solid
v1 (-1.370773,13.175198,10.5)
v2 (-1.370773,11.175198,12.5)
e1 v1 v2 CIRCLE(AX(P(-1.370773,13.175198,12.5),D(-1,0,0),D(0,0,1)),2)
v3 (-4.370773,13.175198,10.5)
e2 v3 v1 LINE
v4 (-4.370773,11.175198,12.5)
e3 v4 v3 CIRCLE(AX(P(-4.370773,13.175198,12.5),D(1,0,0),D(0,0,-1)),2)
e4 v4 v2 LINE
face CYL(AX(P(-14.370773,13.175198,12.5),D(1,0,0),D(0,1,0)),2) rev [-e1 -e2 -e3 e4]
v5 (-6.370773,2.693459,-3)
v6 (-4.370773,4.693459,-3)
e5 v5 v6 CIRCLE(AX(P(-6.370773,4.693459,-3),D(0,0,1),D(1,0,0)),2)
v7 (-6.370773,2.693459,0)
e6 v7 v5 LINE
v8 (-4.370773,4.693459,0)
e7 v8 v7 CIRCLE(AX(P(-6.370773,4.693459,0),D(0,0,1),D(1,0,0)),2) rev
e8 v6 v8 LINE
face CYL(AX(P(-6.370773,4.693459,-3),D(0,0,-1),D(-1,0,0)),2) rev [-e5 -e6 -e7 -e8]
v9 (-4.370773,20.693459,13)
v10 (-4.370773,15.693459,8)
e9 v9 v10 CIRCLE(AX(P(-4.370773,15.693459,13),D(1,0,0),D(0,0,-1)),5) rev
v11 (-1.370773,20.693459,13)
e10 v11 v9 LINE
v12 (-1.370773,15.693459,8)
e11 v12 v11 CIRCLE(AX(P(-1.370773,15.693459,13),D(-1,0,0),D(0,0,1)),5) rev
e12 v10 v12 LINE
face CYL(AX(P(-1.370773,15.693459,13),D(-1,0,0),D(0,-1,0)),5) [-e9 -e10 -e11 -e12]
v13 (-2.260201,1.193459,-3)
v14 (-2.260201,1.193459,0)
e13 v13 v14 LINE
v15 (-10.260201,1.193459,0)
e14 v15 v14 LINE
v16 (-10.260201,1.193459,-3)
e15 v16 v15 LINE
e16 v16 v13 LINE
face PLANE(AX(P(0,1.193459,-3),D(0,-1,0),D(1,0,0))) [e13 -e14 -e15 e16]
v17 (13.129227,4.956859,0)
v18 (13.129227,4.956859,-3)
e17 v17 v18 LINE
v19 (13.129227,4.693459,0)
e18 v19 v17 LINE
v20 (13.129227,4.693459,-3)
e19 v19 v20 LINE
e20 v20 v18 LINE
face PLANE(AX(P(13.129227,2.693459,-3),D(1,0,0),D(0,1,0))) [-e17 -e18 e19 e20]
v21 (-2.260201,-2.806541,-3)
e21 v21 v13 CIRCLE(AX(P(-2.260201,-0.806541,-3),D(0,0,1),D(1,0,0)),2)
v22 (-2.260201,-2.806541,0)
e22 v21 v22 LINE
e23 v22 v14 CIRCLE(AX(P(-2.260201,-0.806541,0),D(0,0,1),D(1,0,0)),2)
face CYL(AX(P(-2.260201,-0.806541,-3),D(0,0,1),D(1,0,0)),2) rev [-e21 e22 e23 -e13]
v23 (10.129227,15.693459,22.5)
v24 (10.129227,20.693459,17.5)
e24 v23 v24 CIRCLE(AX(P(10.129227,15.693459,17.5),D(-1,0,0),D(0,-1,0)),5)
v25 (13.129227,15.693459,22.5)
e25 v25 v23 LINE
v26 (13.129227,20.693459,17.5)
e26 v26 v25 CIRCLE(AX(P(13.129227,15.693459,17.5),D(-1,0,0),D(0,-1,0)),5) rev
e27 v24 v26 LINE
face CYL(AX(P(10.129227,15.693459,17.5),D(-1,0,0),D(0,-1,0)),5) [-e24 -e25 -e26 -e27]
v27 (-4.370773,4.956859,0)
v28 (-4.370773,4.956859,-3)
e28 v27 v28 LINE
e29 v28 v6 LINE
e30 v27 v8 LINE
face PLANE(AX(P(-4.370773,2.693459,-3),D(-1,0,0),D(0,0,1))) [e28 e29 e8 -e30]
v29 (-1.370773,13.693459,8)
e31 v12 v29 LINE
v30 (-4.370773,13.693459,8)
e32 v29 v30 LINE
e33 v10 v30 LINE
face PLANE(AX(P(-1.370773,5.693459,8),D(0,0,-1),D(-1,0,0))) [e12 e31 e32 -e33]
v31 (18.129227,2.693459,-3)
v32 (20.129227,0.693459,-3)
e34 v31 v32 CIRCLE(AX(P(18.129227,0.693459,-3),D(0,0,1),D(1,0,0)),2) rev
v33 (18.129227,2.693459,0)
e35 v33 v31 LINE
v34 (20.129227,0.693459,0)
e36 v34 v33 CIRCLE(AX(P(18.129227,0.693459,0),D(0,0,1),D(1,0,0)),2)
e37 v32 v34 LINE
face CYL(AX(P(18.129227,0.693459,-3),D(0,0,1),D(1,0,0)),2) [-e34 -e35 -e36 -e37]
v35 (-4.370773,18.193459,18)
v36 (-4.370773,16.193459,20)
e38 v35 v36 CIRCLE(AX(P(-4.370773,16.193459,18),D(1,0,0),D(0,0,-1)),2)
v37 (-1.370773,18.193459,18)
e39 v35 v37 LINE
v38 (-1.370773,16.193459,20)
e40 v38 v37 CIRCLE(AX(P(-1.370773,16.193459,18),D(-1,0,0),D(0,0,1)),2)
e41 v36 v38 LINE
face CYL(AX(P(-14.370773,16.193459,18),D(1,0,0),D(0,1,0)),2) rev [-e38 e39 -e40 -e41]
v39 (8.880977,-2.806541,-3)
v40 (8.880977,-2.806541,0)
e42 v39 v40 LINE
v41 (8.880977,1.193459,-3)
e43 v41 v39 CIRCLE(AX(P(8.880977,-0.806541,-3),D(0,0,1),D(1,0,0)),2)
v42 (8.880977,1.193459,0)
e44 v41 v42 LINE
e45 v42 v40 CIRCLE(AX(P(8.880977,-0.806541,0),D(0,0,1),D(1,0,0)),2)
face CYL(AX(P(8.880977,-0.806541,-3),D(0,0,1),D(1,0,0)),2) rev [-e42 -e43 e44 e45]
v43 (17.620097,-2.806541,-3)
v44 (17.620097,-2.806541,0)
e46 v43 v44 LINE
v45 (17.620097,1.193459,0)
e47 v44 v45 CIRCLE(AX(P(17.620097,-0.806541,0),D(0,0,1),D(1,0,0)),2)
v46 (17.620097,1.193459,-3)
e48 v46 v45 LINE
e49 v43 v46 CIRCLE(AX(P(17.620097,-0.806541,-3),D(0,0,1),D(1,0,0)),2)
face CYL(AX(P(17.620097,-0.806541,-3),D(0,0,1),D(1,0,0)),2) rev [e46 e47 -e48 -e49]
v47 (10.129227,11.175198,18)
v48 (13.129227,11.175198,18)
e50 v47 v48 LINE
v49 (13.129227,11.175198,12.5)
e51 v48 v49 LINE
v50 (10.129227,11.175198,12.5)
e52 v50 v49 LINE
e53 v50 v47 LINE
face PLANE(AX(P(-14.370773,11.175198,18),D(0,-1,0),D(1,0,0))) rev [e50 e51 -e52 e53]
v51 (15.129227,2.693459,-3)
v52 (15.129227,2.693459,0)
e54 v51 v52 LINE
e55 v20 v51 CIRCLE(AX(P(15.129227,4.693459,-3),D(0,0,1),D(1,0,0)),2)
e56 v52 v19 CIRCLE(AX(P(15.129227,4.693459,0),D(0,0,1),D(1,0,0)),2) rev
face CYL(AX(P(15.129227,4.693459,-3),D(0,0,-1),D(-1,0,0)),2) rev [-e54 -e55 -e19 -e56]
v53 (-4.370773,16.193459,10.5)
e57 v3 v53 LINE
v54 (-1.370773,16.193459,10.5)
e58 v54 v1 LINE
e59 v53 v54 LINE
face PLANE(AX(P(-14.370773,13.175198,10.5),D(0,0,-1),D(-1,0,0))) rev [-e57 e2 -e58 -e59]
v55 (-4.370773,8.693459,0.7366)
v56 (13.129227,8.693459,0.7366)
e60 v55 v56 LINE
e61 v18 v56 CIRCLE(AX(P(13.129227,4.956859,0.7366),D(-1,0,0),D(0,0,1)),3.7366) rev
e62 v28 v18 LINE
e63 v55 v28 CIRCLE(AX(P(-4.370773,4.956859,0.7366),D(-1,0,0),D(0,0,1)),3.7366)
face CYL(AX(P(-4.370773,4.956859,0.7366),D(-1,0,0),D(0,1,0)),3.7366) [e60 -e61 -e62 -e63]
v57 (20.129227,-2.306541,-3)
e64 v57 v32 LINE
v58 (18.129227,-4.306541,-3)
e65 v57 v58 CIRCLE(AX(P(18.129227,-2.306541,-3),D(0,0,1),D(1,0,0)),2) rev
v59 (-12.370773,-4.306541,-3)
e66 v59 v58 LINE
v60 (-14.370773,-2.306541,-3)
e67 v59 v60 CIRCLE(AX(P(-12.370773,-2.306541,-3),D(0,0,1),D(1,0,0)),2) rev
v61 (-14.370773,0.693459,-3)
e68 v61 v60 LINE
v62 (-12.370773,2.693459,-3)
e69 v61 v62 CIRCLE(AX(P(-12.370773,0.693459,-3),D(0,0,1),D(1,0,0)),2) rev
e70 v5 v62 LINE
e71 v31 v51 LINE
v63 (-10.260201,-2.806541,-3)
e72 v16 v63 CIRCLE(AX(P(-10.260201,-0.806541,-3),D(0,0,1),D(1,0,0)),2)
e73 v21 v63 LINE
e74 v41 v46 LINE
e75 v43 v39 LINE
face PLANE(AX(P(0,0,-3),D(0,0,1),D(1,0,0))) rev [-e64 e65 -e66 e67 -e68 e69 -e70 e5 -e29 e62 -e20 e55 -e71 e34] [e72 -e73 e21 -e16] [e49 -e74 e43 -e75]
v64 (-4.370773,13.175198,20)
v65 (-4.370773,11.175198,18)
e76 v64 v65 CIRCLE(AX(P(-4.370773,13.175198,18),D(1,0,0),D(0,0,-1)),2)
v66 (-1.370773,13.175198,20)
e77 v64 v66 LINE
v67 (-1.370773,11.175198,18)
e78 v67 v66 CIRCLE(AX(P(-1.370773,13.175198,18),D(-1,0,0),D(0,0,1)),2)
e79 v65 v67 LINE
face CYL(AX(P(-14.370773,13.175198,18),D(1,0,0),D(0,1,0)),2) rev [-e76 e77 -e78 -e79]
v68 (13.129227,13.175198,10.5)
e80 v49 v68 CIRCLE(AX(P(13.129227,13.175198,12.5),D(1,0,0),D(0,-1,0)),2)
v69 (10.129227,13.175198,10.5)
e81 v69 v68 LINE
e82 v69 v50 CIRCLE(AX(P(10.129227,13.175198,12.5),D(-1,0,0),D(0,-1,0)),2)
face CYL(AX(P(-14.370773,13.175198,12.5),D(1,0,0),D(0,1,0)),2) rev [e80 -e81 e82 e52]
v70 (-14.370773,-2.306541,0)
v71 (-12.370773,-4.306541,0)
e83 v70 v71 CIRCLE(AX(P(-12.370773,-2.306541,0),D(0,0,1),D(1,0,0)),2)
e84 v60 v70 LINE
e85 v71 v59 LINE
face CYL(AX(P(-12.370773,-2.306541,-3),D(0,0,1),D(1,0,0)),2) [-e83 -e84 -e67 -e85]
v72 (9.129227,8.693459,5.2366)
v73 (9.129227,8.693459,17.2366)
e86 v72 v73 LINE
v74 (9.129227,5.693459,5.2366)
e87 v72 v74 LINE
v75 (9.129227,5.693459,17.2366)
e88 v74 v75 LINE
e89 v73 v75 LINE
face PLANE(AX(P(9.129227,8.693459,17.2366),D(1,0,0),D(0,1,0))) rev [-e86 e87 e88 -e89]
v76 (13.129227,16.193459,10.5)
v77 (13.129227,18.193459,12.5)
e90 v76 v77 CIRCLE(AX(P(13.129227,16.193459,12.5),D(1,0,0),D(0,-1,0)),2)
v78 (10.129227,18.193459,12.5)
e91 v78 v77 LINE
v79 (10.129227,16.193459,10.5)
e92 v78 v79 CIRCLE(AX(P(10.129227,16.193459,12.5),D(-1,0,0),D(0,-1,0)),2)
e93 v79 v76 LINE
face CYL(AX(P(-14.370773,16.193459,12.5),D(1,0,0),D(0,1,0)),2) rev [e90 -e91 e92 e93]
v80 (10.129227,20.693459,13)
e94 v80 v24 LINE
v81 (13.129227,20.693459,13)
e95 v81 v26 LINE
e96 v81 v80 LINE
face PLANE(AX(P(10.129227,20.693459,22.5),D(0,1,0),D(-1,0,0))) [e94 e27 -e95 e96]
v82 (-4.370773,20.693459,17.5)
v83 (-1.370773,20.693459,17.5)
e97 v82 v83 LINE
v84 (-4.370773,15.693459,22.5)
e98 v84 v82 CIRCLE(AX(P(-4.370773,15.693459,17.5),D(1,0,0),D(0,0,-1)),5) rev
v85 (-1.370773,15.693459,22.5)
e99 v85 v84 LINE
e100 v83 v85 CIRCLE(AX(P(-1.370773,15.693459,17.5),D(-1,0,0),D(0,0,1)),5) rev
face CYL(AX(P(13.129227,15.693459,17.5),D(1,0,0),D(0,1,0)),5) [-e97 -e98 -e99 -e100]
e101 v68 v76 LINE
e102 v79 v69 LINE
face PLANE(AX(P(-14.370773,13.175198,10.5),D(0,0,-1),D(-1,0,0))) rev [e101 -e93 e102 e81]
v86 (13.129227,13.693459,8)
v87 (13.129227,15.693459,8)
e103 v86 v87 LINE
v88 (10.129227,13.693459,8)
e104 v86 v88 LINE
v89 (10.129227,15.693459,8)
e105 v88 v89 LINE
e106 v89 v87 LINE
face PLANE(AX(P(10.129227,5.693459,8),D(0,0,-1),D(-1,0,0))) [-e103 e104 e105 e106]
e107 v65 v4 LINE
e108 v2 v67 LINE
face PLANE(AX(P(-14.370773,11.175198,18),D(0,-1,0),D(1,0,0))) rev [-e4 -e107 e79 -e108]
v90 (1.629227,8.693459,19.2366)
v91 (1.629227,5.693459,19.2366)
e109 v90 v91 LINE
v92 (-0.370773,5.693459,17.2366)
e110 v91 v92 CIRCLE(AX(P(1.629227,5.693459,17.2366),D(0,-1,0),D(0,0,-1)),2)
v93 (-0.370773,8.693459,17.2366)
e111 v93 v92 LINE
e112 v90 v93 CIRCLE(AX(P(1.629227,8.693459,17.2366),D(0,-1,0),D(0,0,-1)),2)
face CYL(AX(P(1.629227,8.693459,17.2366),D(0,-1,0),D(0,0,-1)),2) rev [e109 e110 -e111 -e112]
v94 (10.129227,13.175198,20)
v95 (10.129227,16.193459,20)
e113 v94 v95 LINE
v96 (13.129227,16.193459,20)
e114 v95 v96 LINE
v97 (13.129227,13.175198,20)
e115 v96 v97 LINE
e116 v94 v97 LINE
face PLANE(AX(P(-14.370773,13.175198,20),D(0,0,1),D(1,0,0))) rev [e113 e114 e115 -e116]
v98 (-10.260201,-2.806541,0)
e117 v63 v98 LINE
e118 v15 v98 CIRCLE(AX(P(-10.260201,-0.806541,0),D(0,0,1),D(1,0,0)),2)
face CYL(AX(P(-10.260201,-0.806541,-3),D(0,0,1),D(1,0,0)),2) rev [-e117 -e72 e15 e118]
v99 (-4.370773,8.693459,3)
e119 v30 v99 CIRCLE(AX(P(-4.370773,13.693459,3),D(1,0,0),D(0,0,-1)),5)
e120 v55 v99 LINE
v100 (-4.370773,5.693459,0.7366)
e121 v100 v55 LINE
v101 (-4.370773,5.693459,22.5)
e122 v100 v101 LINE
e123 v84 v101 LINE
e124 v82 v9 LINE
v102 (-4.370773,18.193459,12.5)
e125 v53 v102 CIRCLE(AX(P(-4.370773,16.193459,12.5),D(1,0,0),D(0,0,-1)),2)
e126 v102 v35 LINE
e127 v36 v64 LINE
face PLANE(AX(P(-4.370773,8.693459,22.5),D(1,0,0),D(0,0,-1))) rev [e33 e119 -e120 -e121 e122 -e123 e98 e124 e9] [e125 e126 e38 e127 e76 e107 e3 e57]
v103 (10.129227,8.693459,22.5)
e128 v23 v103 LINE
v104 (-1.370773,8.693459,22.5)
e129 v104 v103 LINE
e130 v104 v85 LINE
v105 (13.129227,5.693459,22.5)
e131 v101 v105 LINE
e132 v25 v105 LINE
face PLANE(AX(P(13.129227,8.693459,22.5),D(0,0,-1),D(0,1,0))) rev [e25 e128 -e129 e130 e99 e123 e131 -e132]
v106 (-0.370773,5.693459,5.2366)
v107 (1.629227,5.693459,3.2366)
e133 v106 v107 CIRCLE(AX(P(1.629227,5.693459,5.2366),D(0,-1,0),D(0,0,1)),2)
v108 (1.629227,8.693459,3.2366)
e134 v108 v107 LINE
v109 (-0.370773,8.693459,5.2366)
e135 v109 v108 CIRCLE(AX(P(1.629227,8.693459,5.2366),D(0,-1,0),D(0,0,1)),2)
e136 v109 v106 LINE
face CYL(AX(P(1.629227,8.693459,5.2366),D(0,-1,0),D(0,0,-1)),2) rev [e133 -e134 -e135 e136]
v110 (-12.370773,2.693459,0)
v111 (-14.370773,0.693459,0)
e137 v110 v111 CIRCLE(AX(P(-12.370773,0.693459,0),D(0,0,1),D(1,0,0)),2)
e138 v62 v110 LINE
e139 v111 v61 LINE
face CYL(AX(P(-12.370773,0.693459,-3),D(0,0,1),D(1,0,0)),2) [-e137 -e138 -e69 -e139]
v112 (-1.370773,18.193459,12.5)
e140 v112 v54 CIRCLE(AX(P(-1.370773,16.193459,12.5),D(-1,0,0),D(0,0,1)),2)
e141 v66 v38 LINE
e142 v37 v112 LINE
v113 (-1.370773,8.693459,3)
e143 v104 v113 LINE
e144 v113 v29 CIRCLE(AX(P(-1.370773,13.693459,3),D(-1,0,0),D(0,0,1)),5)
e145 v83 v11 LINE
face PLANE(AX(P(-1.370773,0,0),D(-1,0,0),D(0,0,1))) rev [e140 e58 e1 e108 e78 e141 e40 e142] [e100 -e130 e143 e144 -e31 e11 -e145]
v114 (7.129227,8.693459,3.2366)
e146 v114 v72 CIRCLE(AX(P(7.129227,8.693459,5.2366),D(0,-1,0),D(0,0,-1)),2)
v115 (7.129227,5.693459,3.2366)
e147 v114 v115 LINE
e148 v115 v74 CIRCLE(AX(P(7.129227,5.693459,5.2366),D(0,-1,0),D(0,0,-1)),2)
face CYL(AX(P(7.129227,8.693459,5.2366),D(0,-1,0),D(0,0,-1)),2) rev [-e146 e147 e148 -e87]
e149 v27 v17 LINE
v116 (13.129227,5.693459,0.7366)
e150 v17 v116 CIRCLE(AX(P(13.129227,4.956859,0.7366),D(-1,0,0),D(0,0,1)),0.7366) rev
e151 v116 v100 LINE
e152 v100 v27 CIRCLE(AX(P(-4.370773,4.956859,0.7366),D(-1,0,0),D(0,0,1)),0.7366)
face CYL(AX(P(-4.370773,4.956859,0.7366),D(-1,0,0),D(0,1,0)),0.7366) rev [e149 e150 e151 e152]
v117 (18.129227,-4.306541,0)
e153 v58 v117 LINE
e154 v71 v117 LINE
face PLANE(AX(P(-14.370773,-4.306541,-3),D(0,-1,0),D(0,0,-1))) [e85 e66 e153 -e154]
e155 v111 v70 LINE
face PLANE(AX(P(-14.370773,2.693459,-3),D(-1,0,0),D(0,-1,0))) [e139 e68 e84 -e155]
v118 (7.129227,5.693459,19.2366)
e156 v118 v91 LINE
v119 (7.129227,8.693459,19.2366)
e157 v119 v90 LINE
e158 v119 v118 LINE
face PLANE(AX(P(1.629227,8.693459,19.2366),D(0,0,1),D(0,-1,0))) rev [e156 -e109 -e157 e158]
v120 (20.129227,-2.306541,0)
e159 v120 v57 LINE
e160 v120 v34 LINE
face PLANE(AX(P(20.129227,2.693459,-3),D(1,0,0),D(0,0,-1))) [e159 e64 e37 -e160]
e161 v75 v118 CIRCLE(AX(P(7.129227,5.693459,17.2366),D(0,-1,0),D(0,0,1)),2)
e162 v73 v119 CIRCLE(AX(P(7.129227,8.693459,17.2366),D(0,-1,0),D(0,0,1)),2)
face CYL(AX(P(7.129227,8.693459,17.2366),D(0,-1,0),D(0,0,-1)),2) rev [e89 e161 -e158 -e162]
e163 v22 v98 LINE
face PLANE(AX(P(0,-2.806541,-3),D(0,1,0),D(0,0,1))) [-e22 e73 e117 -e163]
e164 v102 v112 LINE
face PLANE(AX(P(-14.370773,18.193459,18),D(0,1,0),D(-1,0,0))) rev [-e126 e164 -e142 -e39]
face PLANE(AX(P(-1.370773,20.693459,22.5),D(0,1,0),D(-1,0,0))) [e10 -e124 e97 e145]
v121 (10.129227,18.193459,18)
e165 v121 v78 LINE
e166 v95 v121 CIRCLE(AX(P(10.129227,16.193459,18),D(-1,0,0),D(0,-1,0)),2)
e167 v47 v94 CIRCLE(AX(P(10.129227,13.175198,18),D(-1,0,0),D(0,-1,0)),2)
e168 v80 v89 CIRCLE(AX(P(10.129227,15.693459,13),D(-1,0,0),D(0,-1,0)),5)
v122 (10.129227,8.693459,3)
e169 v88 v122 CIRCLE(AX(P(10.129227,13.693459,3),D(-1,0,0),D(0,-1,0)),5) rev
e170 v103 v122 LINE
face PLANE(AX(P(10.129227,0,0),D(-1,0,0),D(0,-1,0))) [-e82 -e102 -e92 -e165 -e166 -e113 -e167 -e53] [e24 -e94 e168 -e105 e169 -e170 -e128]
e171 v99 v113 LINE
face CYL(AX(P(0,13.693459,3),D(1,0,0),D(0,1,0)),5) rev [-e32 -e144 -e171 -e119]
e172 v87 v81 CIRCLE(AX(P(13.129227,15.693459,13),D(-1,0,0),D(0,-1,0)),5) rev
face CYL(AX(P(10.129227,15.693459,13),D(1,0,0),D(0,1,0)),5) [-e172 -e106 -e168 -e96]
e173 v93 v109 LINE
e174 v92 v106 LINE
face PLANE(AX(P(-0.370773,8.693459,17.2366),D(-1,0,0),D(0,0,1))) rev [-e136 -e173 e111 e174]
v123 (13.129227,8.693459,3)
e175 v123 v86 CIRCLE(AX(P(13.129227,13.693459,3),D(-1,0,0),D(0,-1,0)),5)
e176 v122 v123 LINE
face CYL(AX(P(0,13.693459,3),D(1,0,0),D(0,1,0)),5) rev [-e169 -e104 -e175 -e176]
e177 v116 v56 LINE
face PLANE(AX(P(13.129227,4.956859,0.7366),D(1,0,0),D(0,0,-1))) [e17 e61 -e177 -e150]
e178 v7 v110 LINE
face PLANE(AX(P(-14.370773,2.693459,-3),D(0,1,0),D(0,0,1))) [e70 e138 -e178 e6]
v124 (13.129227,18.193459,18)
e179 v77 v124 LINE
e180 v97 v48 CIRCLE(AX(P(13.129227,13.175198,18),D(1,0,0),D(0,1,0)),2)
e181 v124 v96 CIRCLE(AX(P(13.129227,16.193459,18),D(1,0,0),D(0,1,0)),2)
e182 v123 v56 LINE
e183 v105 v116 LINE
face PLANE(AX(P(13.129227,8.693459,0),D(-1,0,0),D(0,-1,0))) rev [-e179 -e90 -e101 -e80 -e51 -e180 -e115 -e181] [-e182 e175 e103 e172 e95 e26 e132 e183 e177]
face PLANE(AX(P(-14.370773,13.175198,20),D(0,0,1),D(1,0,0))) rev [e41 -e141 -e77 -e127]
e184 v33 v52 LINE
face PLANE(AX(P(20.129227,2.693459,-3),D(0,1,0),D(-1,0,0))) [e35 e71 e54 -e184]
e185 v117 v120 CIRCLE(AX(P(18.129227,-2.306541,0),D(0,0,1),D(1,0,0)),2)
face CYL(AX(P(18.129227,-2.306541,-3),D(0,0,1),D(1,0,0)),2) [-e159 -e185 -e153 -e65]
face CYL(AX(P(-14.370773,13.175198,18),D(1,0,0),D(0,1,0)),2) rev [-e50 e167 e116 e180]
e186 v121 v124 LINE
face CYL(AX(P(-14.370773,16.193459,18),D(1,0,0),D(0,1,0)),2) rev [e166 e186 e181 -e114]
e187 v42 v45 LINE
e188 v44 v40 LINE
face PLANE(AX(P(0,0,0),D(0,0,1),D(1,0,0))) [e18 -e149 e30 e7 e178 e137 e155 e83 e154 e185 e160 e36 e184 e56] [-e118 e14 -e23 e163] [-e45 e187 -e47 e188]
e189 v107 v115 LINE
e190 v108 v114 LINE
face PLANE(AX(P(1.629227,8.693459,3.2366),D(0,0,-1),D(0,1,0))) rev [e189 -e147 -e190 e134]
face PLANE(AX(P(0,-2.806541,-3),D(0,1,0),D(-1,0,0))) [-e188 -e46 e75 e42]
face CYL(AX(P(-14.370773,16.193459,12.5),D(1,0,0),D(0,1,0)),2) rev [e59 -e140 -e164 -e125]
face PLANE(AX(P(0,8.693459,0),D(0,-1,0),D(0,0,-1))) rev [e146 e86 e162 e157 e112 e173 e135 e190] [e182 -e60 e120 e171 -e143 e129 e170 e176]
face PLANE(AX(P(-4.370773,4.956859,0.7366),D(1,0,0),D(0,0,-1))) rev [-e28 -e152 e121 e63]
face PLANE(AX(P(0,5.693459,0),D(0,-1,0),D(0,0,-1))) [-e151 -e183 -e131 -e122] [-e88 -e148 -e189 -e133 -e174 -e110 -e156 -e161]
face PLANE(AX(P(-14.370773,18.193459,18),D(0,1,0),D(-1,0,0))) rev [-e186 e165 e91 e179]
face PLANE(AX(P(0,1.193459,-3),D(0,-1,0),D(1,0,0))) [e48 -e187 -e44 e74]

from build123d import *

# Parameters (mm, degrees)
FLANGE_BASE1_DEPTH             = 3
CORTE_EXTRUS_O1_DEPTH          = 3
ARESTA_FLANGE4_STRIP_W         = 13.4732
ARESTA_FLANGE4_STRIP_H         = 3
ARESTA_FLANGE4_STRIP_CUT_DEPTH = 17.5
ARESTA_FLANGE4_DEPTH           = 17.5
ESBO_O47_W                     = 14.5
ESBO_O47_H                     = 15
RESSALTO_EXTRUS_O1_DEPTH       = 3
FILETE1_R                      = 5
ESBO_O48_W                     = 14.5
ESBO_O48_H                     = 15
RESSALTO_EXTRUS_O2_DEPTH       = 3
FILETE2_R                      = 5
FILETE3_R                      = 2
CORTE_EXTRUS_O5_DEPTH          = 42.11835661
CORTE_EXTRUS_O6_DEPTH          = 3


# Sheet-metal steps are written as plain solids
with BuildPart() as part:
    # Esboço1 → Flange-base1 (new body)
    with BuildSketch(Plane.XY):
        Polygon((-14.370772566, 2.693459119), (-4.370772566, 2.693459119), (-4.370772566, 5.693459119), (13.129227434, 5.693459119), (13.129227434, 2.693459119), (20.129227434, 2.693459119), (20.129227434, -4.306540881), (-14.370772566, -4.306540881), align=None)
    extrude(amount=-FLANGE_BASE1_DEPTH)

    # Esboço8 → Corte-extrusão1 (cut)
    with BuildSketch(Plane.XY):
        with BuildLine():
            Line((-10.260200759, 1.193459119), (-2.260200759, 1.193459119))
            ThreePointArc((-2.260200759, 1.193459119), (-0.260200759, -0.806540881), (-2.260200759, -2.806540881))
            Line((-2.260200759, -2.806540881), (-10.260200759, -2.806540881))
            ThreePointArc((-10.260200759, -2.806540881), (-12.260200759, -0.806540881), (-10.260200759, 1.193459119))
        make_face()
        with BuildLine():
            Line((8.88097681, 1.193459119), (17.620096532, 1.193459119))
            ThreePointArc((17.620096532, 1.193459119), (19.620096532, -0.806540881), (17.620096532, -2.806540881))
            Line((17.620096532, -2.806540881), (8.88097681, -2.806540881))
            ThreePointArc((8.88097681, -2.806540881), (6.88097681, -0.806540881), (8.88097681, 1.193459119))
        make_face()
    extrude(amount=-CORTE_EXTRUS_O1_DEPTH, mode=Mode.SUBTRACT)

    # Aresta-Flange4 strip (across the edge) → Aresta-Flange4 strip cut (cut)
    with BuildSketch(Plane(origin=(13.129227434, 5.693459119, 0), x_dir=(0, -1, 0), z_dir=(-1, 0, 0))):
        with Locations((-6, -1.5)):
            Rectangle(ARESTA_FLANGE4_STRIP_W, ARESTA_FLANGE4_STRIP_H)
    extrude(amount=ARESTA_FLANGE4_STRIP_CUT_DEPTH, mode=Mode.SUBTRACT)

    # Aresta-Flange4 section (across the edge) → Aresta-Flange4 (add)
    with BuildSketch(Plane(origin=(13.129227434, 5.693459119, 0), x_dir=(0, -1, 0), z_dir=(-1, 0, 0))):
        with BuildLine():
            Line((-3, 0.7366), (-3, 22.5))
            Line((-3, 22.5), (0, 22.5))
            Line((0, 22.5), (0, 0.7366))
            ThreePointArc((0, 0.7366), (0.215745145, 0.215745145), (0.7366, 0))
            Line((0.7366, 0), (0.7366, -3))
            ThreePointArc((0.7366, -3), (-1.905575199, -1.905575199), (-3, 0.7366))
        make_face()
    extrude(amount=ARESTA_FLANGE4_DEPTH)

    # Esboço47 → Ressalto-extrusão1 (add)
    with BuildSketch(Plane(origin=(13.129227434, 0, 0), x_dir=(0, 0, -1), z_dir=(1, 0, 0))):
        with Locations((-15.25, 13.193459119)):
            Rectangle(ESBO_O47_W, ESBO_O47_H)
    extrude(amount=-RESSALTO_EXTRUS_O1_DEPTH)

    # Filete1
    filete1_edges = [part.edges().sort_by_distance(p)[0] for p in [
        (11.629227434, 20.693459119, 22.5),
        (11.629227434, 8.693459119, 8),
        (11.629227434, 20.693459119, 8),
    ]]
    fillet(filete1_edges, radius=FILETE1_R)

    # Esboço48 → Ressalto-extrusão2 (add)
    with BuildSketch(Plane.ZY.offset(4.370772566)):
        with Locations((15.25, 13.193459119)):
            Rectangle(ESBO_O48_W, ESBO_O48_H)
    extrude(amount=-RESSALTO_EXTRUS_O2_DEPTH)

    # Filete2
    filete2_edges = [part.edges().sort_by_distance(p)[0] for p in [
        (-2.870772566, 20.693459119, 22.5),
        (-2.870772566, 8.693459119, 8),
        (-2.870772566, 20.693459119, 8),
    ]]
    fillet(filete2_edges, radius=FILETE2_R)

    # Filete3
    filete3_edges = [part.edges().sort_by_distance(p)[0] for p in [
        (20.129227434, -4.306540881, -1.5),
        (-14.370772566, -4.306540881, -1.5),
        (-14.370772566, 2.693459119, -1.5),
        (-4.370772566, 2.693459119, -1.5),
        (13.129227434, 2.693459119, -1.5),
        (20.129227434, 2.693459119, -1.5),
    ]]
    fillet(filete3_edges, radius=FILETE3_R)

    # Esboço49 → Corte-extrusão5 (cut, through all)
    with BuildSketch(Plane(origin=(13.129227434, 0, 0), x_dir=(0, 0, -1), z_dir=(1, 0, 0))):
        with BuildLine():
            Line((-18, 11.175198381), (-12.5, 11.175198381))
            ThreePointArc((-12.5, 11.175198381), (-11.085786438, 11.760984819), (-10.5, 13.175198381))
            Line((-10.5, 13.175198381), (-10.5, 16.193459119))
            ThreePointArc((-10.5, 16.193459119), (-11.085786438, 17.607672682), (-12.5, 18.193459119))
            Line((-12.5, 18.193459119), (-18, 18.193459119))
            ThreePointArc((-18, 18.193459119), (-19.414213562, 17.607672682), (-20, 16.193459119))
            Line((-20, 16.193459119), (-20, 13.175198381))
            ThreePointArc((-20, 13.175198381), (-19.414213562, 11.760984819), (-18, 11.175198381))
        make_face()
    extrude(amount=-CORTE_EXTRUS_O5_DEPTH, mode=Mode.SUBTRACT)

    # Esboço50 → Corte-extrusão6 (cut)
    with BuildSketch(Plane.XZ.offset(-5.693459119)):
        with BuildLine():
            Line((1.629227434, 19.2366), (7.129227434, 19.2366))
            ThreePointArc((7.129227434, 19.2366), (8.543440996, 18.650813562), (9.129227434, 17.2366))
            Line((9.129227434, 17.2366), (9.129227434, 5.2366))
            ThreePointArc((9.129227434, 5.2366), (8.543440996, 3.822386438), (7.129227434, 3.2366))
            Line((7.129227434, 3.2366), (1.629227434, 3.2366))
            ThreePointArc((1.629227434, 3.2366), (0.215013871, 3.822386438), (-0.370772566, 5.2366))
            Line((-0.370772566, 5.2366), (-0.370772566, 17.2366))
            ThreePointArc((-0.370772566, 17.2366), (0.215013871, 18.650813562), (1.629227434, 19.2366))
        make_face()
    extrude(amount=-CORTE_EXTRUS_O6_DEPTH, mode=Mode.SUBTRACT)


solid = part.part
